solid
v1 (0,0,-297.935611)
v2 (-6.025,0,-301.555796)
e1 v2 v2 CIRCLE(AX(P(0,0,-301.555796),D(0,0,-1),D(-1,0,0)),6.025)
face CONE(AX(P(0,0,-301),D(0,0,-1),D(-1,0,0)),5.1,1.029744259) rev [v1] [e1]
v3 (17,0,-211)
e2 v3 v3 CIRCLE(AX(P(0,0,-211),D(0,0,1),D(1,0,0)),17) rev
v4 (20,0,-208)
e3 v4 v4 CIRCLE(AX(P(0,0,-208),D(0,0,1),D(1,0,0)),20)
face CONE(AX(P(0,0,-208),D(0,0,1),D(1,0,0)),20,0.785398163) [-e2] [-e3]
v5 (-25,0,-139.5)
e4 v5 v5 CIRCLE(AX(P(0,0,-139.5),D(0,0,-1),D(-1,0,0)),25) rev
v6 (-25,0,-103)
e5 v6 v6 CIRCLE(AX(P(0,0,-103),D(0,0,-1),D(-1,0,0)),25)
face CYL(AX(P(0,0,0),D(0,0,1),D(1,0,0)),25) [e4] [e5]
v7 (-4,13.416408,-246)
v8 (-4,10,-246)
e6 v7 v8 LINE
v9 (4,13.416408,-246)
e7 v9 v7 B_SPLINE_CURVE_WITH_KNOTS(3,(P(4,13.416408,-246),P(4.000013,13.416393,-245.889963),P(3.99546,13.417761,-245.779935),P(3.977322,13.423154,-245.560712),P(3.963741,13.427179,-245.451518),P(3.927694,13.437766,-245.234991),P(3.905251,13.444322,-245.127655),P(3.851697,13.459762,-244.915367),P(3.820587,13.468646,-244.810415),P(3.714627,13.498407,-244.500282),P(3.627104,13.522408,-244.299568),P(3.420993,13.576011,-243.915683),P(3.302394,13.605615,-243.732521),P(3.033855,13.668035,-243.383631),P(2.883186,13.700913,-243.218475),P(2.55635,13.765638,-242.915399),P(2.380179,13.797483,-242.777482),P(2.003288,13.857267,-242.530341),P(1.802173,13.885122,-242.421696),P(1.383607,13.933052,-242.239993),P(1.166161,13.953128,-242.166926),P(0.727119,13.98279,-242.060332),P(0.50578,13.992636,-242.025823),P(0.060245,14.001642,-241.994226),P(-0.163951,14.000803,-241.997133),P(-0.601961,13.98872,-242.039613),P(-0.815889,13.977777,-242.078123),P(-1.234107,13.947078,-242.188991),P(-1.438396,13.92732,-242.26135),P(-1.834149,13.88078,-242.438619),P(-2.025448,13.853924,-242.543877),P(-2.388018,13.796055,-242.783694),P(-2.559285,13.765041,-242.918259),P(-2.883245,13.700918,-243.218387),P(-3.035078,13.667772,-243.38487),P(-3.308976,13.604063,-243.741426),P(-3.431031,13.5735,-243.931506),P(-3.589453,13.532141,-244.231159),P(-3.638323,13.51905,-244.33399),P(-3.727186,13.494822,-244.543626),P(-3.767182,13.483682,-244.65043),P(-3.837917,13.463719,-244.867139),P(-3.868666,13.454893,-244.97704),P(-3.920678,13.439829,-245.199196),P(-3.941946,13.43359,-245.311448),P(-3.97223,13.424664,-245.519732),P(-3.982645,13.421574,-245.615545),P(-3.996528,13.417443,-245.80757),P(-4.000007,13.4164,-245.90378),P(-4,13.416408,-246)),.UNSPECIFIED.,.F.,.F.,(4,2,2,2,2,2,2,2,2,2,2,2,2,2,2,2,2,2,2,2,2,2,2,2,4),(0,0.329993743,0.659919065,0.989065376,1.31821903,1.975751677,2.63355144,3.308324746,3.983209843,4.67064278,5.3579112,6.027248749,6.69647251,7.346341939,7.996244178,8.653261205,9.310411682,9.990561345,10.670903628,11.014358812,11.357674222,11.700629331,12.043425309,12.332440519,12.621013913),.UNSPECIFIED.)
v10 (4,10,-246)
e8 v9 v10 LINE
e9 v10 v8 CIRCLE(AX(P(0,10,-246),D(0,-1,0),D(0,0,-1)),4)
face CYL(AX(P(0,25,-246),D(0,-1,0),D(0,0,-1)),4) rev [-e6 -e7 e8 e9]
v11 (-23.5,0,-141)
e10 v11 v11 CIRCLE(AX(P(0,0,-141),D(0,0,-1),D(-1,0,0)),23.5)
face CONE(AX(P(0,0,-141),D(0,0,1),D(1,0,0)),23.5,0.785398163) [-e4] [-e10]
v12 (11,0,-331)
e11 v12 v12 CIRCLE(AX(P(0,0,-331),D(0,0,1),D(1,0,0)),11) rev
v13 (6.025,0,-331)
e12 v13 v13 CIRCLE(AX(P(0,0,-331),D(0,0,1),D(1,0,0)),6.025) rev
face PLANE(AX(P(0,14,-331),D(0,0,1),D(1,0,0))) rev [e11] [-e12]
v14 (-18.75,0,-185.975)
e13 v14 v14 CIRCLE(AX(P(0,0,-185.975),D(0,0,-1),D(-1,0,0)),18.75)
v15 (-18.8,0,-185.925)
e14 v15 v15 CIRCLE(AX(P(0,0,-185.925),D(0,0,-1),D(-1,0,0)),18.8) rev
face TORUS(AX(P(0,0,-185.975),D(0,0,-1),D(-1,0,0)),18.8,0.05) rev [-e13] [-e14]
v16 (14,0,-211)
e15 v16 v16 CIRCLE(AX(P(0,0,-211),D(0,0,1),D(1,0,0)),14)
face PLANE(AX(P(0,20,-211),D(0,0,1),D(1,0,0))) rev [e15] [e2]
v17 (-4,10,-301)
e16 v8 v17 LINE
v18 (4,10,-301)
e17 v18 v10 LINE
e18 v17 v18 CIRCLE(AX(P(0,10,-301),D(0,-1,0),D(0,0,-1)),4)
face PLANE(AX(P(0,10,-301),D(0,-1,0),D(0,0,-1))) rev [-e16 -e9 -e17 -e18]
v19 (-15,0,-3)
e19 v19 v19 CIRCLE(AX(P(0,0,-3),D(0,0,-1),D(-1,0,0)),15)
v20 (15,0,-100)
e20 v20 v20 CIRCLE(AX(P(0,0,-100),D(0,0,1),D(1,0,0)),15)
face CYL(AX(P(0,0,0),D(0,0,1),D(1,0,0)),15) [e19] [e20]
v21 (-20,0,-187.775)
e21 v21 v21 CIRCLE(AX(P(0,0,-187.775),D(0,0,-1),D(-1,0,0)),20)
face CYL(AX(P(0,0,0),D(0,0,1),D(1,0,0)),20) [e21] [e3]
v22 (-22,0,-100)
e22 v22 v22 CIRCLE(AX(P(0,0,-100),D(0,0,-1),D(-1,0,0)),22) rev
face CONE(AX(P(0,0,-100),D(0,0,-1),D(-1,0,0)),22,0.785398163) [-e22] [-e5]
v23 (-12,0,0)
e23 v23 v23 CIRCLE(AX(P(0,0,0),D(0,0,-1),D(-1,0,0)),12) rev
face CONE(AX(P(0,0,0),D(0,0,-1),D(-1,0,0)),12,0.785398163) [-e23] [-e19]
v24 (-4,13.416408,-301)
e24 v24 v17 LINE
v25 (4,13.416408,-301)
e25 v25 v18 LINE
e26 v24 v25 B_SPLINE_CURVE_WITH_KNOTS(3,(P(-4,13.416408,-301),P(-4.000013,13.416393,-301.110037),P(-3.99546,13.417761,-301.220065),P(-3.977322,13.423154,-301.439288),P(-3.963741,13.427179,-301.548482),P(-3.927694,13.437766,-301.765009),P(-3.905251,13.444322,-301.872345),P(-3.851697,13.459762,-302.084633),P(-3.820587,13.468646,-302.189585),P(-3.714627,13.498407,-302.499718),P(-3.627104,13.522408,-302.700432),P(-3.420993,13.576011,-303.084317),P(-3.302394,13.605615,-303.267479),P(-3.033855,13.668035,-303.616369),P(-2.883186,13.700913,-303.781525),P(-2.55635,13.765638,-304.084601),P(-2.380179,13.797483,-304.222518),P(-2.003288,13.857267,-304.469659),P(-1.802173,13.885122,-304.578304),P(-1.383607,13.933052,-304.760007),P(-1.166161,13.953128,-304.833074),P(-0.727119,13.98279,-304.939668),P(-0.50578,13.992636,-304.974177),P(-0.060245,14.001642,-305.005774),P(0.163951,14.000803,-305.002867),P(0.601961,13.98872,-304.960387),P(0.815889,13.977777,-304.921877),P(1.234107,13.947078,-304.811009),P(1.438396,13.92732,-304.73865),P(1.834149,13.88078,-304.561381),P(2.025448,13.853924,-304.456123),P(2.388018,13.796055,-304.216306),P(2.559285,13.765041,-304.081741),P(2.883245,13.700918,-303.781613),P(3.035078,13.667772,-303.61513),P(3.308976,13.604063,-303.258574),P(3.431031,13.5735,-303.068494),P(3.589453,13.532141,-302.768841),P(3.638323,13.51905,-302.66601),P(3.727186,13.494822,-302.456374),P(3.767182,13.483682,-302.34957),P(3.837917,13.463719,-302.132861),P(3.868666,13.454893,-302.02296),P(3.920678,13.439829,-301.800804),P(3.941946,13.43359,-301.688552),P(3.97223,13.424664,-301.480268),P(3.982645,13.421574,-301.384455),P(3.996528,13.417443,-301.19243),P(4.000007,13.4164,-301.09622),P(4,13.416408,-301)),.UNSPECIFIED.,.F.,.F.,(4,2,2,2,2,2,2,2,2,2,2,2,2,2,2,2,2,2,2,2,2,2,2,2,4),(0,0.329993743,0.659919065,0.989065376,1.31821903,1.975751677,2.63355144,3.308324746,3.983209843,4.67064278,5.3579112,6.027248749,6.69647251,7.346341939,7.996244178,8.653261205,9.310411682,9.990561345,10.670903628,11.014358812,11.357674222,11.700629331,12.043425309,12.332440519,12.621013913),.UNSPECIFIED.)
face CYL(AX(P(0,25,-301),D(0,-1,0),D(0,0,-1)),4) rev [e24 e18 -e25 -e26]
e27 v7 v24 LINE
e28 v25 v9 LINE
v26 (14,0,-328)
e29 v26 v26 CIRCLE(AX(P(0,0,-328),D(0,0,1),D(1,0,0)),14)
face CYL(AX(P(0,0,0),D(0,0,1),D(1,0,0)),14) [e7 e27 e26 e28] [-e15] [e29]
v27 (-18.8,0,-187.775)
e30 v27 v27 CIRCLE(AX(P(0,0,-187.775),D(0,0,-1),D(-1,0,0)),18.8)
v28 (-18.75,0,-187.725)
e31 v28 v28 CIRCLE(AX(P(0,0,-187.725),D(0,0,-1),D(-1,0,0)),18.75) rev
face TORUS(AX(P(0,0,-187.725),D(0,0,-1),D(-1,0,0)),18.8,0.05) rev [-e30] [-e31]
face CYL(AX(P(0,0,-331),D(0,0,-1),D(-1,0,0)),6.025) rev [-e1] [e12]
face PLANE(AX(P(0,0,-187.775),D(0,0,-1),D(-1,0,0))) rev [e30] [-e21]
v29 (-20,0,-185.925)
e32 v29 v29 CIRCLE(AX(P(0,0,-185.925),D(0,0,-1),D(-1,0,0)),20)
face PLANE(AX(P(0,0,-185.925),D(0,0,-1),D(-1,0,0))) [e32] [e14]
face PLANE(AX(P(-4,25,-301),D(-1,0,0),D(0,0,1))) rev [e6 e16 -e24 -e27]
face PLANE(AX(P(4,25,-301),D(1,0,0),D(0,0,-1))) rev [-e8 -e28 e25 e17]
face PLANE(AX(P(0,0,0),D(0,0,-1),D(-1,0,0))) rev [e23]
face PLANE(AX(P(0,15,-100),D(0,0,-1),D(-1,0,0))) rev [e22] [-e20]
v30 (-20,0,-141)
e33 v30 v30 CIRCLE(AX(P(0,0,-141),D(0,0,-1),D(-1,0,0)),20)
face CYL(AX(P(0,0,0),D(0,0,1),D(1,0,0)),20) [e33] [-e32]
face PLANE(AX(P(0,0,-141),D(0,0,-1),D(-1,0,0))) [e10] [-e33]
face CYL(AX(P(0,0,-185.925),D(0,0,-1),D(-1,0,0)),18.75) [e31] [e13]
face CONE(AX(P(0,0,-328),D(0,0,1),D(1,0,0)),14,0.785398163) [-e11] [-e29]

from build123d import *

# Parameters (mm, degrees)
CHAMFER_1_SIZE         = 3
HOLE_WIZARD_M121_D     = 10.2
HOLE_WIZARD_M121_DEPTH = 30
HOLE_WIZARD_M121_TIP   = 3.064389157
SKETCH_4_R             = 20
SKETCH_4_R_2           = 18.75
CUT_EXTRUDE_1_DEPTH    = 1.85
FILLET_1_R             = 0.05
CHAMFER_2_SIZE         = 1.5
CUT_EXTRUDE_2_DEPTH    = 334.782863551
SKETCH_9_R             = 25
SKETCH_9_R_2           = 20
CUT_EXTRUDE_4_DEPTH    = 6
CHAMFER_3_SIZE         = 1.5
CHAMFER_4_SIZE         = 3


# Read off the part's stored shape, not the designer's step: Условная геометрия резьбовых отверстий
with BuildPart() as part:
    # Эскиз1 → Повернуть1 (revolve)
    with BuildSketch(Plane(origin=(0, 0, 0), x_dir=(0, 0, -1), z_dir=(1, 0, 0)), mode=Mode.PRIVATE) as revolve_1_sk:
        Polygon((0, 0), (0, 15), (100, 15), (100, 25), (147, 25), (147, 20), (211, 20), (211, 14), (331, 14), (331, 0), align=None)
    revolve(revolve_1_sk.sketch.rotate(Axis((0, 0, 0), (0, 0, -1)), 90), axis=Axis((0, 0, 0), (0, 0, -1)))

    # Фаска1
    chamfer_1_edges = [part.edges().sort_by_distance(p)[0] for p in [
        (-25, 0, -100),
        (-15, 0, 0),
        (-14, 0, -331),
    ]]
    chamfer(chamfer_1_edges, length=CHAMFER_1_SIZE)

    # Отверстие обработанное метчиком M121
    with Locations(Plane(origin=(0, 0, -331), x_dir=(-1, 0, 0), z_dir=(0, 0, -1))):
        with Locations((0, 0)):
            Hole(HOLE_WIZARD_M121_D / 2, depth=HOLE_WIZARD_M121_DEPTH)
            with Locations((0, 0, -(HOLE_WIZARD_M121_DEPTH + HOLE_WIZARD_M121_TIP / 2))):  # 118° drill point
                Cone(0, HOLE_WIZARD_M121_D / 2, HOLE_WIZARD_M121_TIP, mode=Mode.SUBTRACT)

    # Эскиз4 → Вырез-Вытянуть1 (cut)
    with BuildSketch(Plane(origin=(0, 0, -187.775), x_dir=(-1, 0, 0), z_dir=(0, 0, -1))):
        with Locations(Location((0, 0, 0), (0, 0, 180))):
            Circle(SKETCH_4_R)
        Circle(SKETCH_4_R_2, mode=Mode.SUBTRACT)
    extrude(amount=-CUT_EXTRUDE_1_DEPTH, mode=Mode.SUBTRACT)

    # Скругление1
    fillet_1_edges = [part.edges().sort_by_distance(p)[0] for p in [
        (18.75, 0, -185.925),
        (18.75, 0, -187.775),
    ]]
    fillet(fillet_1_edges, radius=FILLET_1_R)

    # Фаска2
    chamfer_2_edges = [part.edges().sort_by_distance(p)[0] for p in [
        (-25, 0, -147),
    ]]
    chamfer(chamfer_2_edges, length=CHAMFER_2_SIZE)

    # Эскиз8 → Вырез-Вытянуть2 (cut, through all)
    with BuildSketch(Plane(origin=(0, 10, -331), x_dir=(-1, 0, 0), z_dir=(0, -1, 0))):
        with BuildLine():
            Line((4, -30), (4, -85))
            ThreePointArc((4, -85), (0, -89), (-4, -85))
            Line((-4, -85), (-4, -30))
            ThreePointArc((-4, -30), (0, -26), (4, -30))
        make_face()
    extrude(amount=-CUT_EXTRUDE_2_DEPTH, mode=Mode.SUBTRACT)

    # Эскиз9 → Вырез-Вытянуть4 (cut)
    with BuildSketch(Plane(origin=(0, 0, -147), x_dir=(-1, 0, 0), z_dir=(0, 0, -1))):
        Circle(SKETCH_9_R)
        Circle(SKETCH_9_R_2, mode=Mode.SUBTRACT)
    extrude(amount=-CUT_EXTRUDE_4_DEPTH, mode=Mode.SUBTRACT)

    # Фаска3
    chamfer_3_edges = [part.edges().sort_by_distance(p)[0] for p in [
        (-25, 0, -141),
    ]]
    chamfer(chamfer_3_edges, length=CHAMFER_3_SIZE)

    # Фаска4
    chamfer_4_edges = [part.edges().sort_by_distance(p)[0] for p in [
        (-20, 0, -211),
    ]]
    chamfer(chamfer_4_edges, length=CHAMFER_4_SIZE)

    # Move Face 2213 outline → Move Face 2213 (revolve, cut)
    with BuildSketch(Plane.XZ):
        Polygon((6.025, -301.555796073), (5.1, -301), (5.1, -331), (6.025, -331), align=None)
    revolve(axis=Axis((0, 0, 0), (0, 0, 1)), mode=Mode.SUBTRACT)


solid = part.part
